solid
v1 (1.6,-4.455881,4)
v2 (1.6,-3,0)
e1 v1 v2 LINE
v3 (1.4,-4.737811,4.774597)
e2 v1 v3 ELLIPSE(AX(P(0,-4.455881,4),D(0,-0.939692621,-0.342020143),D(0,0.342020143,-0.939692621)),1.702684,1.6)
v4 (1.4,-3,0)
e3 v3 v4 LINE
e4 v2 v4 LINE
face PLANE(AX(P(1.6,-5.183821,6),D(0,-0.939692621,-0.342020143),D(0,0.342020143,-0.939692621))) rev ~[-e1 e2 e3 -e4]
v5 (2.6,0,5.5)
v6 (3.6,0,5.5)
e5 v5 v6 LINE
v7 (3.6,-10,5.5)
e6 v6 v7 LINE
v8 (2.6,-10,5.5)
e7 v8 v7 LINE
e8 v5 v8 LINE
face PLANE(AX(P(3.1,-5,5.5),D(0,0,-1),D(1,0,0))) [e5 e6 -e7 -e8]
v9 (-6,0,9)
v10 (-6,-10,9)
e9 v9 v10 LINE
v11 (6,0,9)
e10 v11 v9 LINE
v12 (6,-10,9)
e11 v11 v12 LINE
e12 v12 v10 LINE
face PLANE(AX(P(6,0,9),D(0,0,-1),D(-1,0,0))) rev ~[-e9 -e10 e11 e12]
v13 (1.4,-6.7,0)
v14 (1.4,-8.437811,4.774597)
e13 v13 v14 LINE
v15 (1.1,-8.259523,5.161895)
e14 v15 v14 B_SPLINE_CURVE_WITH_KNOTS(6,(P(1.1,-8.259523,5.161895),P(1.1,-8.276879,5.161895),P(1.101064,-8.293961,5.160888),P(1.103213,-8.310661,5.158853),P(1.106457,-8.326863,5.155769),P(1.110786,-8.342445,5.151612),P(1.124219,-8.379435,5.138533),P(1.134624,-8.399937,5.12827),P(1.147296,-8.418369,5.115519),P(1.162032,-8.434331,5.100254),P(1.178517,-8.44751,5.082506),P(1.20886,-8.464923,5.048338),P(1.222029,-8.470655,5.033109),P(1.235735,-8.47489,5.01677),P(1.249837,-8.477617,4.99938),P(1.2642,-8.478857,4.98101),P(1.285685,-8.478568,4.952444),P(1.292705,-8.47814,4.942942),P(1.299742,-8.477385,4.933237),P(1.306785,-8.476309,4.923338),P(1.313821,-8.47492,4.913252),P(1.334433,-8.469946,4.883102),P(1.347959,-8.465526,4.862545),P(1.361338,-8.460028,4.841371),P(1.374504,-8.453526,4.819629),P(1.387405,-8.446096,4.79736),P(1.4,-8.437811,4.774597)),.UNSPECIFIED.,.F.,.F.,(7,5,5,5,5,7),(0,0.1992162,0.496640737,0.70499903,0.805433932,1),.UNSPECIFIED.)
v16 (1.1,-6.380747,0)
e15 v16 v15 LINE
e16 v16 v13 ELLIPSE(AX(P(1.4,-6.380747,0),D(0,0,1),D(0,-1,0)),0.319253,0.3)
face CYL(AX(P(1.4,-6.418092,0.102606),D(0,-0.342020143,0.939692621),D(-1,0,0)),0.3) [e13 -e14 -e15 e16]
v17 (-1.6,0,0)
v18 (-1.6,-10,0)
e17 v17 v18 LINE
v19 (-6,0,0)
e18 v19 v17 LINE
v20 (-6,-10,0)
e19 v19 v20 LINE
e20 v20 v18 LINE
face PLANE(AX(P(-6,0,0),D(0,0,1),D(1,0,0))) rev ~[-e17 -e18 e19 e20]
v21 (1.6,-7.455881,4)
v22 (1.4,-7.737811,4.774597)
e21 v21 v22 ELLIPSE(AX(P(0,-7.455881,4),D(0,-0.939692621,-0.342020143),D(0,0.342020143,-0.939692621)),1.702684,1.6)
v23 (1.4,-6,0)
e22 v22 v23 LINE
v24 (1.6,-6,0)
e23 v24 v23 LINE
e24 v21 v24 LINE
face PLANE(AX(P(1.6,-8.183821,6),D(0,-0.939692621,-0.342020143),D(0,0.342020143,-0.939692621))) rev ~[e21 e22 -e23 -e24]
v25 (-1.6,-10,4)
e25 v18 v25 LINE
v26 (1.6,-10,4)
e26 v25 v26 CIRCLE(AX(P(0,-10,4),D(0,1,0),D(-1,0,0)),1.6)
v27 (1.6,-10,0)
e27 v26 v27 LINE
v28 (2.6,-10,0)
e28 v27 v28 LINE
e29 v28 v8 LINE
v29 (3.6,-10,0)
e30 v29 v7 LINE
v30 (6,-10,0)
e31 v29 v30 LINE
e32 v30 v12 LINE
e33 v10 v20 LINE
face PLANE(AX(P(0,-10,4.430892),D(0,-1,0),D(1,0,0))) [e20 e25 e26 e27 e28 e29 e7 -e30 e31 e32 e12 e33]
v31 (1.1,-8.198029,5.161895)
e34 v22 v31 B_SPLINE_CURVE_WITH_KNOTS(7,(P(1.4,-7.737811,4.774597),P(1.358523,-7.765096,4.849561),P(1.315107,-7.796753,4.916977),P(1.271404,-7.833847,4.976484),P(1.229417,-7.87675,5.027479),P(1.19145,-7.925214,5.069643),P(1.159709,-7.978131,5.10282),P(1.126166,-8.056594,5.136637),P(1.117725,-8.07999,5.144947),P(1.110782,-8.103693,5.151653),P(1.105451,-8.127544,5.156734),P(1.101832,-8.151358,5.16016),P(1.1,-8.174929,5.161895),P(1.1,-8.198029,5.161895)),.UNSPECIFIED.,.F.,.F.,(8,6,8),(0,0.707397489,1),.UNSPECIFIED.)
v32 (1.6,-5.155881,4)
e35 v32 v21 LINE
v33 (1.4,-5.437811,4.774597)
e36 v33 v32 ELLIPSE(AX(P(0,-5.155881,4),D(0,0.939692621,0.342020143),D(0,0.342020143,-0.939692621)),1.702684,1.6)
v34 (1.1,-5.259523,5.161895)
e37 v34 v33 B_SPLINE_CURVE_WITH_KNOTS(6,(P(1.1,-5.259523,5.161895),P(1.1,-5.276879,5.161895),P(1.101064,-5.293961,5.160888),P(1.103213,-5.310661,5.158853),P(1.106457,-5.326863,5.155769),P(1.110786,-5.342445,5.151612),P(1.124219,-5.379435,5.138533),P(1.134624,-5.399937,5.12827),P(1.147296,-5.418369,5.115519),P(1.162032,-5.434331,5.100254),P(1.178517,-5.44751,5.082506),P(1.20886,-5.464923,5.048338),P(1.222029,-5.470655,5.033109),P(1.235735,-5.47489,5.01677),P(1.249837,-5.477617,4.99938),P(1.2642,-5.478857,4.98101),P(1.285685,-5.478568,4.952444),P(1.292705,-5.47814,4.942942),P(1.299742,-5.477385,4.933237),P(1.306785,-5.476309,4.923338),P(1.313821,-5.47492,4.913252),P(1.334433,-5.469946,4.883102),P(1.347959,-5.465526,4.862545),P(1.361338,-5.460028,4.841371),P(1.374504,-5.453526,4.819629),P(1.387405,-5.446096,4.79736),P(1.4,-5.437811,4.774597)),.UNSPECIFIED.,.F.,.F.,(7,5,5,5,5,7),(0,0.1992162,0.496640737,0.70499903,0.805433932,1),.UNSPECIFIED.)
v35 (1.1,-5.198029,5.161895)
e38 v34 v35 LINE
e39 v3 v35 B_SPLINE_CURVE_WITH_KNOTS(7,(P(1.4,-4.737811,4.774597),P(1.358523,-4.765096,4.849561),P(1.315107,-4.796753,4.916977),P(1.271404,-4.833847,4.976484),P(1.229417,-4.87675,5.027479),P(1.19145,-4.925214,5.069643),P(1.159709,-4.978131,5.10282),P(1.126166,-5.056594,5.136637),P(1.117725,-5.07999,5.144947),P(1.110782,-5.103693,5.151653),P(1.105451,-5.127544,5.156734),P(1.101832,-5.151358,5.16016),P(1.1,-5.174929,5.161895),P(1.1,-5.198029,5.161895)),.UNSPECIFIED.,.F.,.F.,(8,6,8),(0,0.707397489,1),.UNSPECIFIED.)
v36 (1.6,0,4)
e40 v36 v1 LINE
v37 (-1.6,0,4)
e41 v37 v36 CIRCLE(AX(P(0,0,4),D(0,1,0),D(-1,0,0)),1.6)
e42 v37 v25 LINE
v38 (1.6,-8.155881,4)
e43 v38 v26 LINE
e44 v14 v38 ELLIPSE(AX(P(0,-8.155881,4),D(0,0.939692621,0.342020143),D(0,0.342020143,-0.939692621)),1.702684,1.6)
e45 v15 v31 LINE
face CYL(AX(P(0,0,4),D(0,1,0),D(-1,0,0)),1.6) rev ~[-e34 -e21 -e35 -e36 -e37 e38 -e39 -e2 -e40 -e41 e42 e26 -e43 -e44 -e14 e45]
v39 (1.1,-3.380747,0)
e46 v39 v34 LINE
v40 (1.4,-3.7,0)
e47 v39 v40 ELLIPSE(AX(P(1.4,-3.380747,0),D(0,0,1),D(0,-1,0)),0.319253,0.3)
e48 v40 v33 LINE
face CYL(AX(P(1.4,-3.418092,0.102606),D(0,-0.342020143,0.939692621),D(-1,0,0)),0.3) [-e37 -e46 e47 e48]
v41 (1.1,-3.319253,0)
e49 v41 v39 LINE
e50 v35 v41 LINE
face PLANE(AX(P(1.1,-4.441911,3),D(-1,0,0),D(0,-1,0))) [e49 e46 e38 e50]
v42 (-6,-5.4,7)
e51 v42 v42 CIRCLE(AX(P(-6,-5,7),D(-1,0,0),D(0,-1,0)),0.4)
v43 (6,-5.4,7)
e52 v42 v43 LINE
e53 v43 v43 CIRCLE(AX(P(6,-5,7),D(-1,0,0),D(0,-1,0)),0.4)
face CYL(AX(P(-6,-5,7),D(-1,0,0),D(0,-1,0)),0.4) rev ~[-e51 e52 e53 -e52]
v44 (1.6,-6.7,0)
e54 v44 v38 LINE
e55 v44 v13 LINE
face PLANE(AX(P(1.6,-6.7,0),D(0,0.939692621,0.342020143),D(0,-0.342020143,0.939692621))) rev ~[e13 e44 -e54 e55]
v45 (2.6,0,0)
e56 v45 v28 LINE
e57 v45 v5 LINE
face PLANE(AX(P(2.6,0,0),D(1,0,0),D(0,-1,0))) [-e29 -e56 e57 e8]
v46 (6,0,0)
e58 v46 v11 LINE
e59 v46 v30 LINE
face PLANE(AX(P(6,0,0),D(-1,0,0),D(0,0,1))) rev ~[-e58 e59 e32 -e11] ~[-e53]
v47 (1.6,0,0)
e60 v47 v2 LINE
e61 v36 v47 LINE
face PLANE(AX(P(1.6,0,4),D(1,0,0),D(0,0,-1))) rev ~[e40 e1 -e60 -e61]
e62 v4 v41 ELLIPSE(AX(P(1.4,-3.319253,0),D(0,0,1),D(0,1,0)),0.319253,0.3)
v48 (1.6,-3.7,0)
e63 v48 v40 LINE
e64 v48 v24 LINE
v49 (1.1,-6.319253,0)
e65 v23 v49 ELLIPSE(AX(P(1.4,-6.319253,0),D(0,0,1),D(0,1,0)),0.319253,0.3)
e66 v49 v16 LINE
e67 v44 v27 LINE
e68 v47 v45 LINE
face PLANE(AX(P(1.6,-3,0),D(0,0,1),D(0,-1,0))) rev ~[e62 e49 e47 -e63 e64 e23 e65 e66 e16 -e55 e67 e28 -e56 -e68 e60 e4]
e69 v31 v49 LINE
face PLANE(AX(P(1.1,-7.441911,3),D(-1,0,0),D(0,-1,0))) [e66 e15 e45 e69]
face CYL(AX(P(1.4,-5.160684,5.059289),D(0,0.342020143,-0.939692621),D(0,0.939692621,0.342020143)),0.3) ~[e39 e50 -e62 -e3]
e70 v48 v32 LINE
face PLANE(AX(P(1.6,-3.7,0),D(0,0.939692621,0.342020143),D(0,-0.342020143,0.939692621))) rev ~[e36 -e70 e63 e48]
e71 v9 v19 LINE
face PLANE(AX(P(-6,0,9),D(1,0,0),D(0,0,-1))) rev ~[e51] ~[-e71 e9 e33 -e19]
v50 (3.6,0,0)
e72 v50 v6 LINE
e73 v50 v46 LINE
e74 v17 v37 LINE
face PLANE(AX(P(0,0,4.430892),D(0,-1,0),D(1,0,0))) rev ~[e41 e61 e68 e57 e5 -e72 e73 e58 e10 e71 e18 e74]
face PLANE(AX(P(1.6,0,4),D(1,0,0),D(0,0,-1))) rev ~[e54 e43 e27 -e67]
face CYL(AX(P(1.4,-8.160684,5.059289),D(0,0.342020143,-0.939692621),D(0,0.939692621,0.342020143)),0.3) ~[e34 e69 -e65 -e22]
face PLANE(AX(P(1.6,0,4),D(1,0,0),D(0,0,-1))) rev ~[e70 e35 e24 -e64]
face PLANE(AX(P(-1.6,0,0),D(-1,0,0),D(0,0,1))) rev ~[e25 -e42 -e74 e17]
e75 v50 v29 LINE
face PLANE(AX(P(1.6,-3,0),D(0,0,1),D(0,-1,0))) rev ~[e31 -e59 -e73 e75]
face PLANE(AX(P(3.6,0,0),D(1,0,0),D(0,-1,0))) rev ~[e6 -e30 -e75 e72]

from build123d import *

# Parameters (mm, degrees)
F1_DEPTH = 10
F3_DEPTH = 0.5
F4_R     = 0.3
F5_W     = 1
F5_H     = 10
F6_DEPTH = 5.5
F7_R     = 0.4
F8_DEPTH = 12.001


# Not quite as in the source:
# - a feature names something its author has since deleted; it is built from what else it names


with BuildPart() as f1:
    # F0 (on Front) → F1 (new body)
    with BuildSketch(Plane.XZ):
        with BuildLine():
            Line((-6, 9), (-6, 0))
            Line((-6, 0), (-1.6, 0))
            Line((-1.6, 0), (-1.6, 4))
            ThreePointArc((-1.6, 4), (0, 5.6), (1.6, 4))
            Line((1.6, 4), (1.6, 0))
            Line((1.6, 0), (6, 0))
            Line((6, 0), (6, 9))
            Line((6, 9), (-6, 9))
        make_face()
    extrude(amount=F1_DEPTH)

    # F2 (on face) → F3 (join)
    with BuildSketch(Plane(origin=(1.6, 0, 0), x_dir=(0, -1, 0), z_dir=(-1, 0, 0))):
        Polygon((5.1838214056, 6), (3, 0), (3.7, 0), (5.8838214056, 6), align=None)
        Polygon((6, 0), (6.7, 0), (8.8838214056, 6), (8.1838214056, 6), align=None)
    extrude(amount=F3_DEPTH)

    # F4
    f4_edges = [f1.edges().sort_by_distance(p)[0] for p in [
        (1.1, -3.939388, 2.580948),
        (1.1, -4.639388, 2.580948),
        (1.1, -6.939388, 2.580948),
        (1.1, -7.639388, 2.580948),
    ]]
    fillet(f4_edges, radius=F4_R)

    # F5 (on face) → F6 (cut)
    with BuildSketch(Plane(origin=(0, 0, 0), x_dir=(1, 0, 0), z_dir=(0, 0, -1))):
        with Locations((3.1, 5)):
            Rectangle(F5_W, F5_H)
    extrude(amount=-F6_DEPTH, mode=Mode.SUBTRACT)

    # F7 (on face) → F8 (cut, through all)
    with BuildSketch(Plane(origin=(-6, 0, 0), x_dir=(0, -1, 0), z_dir=(-1, 0, 0))):
        with Locations((5, 7)):
            Circle(F7_R)
    extrude(amount=-F8_DEPTH, mode=Mode.SUBTRACT)


solid = f1.part
